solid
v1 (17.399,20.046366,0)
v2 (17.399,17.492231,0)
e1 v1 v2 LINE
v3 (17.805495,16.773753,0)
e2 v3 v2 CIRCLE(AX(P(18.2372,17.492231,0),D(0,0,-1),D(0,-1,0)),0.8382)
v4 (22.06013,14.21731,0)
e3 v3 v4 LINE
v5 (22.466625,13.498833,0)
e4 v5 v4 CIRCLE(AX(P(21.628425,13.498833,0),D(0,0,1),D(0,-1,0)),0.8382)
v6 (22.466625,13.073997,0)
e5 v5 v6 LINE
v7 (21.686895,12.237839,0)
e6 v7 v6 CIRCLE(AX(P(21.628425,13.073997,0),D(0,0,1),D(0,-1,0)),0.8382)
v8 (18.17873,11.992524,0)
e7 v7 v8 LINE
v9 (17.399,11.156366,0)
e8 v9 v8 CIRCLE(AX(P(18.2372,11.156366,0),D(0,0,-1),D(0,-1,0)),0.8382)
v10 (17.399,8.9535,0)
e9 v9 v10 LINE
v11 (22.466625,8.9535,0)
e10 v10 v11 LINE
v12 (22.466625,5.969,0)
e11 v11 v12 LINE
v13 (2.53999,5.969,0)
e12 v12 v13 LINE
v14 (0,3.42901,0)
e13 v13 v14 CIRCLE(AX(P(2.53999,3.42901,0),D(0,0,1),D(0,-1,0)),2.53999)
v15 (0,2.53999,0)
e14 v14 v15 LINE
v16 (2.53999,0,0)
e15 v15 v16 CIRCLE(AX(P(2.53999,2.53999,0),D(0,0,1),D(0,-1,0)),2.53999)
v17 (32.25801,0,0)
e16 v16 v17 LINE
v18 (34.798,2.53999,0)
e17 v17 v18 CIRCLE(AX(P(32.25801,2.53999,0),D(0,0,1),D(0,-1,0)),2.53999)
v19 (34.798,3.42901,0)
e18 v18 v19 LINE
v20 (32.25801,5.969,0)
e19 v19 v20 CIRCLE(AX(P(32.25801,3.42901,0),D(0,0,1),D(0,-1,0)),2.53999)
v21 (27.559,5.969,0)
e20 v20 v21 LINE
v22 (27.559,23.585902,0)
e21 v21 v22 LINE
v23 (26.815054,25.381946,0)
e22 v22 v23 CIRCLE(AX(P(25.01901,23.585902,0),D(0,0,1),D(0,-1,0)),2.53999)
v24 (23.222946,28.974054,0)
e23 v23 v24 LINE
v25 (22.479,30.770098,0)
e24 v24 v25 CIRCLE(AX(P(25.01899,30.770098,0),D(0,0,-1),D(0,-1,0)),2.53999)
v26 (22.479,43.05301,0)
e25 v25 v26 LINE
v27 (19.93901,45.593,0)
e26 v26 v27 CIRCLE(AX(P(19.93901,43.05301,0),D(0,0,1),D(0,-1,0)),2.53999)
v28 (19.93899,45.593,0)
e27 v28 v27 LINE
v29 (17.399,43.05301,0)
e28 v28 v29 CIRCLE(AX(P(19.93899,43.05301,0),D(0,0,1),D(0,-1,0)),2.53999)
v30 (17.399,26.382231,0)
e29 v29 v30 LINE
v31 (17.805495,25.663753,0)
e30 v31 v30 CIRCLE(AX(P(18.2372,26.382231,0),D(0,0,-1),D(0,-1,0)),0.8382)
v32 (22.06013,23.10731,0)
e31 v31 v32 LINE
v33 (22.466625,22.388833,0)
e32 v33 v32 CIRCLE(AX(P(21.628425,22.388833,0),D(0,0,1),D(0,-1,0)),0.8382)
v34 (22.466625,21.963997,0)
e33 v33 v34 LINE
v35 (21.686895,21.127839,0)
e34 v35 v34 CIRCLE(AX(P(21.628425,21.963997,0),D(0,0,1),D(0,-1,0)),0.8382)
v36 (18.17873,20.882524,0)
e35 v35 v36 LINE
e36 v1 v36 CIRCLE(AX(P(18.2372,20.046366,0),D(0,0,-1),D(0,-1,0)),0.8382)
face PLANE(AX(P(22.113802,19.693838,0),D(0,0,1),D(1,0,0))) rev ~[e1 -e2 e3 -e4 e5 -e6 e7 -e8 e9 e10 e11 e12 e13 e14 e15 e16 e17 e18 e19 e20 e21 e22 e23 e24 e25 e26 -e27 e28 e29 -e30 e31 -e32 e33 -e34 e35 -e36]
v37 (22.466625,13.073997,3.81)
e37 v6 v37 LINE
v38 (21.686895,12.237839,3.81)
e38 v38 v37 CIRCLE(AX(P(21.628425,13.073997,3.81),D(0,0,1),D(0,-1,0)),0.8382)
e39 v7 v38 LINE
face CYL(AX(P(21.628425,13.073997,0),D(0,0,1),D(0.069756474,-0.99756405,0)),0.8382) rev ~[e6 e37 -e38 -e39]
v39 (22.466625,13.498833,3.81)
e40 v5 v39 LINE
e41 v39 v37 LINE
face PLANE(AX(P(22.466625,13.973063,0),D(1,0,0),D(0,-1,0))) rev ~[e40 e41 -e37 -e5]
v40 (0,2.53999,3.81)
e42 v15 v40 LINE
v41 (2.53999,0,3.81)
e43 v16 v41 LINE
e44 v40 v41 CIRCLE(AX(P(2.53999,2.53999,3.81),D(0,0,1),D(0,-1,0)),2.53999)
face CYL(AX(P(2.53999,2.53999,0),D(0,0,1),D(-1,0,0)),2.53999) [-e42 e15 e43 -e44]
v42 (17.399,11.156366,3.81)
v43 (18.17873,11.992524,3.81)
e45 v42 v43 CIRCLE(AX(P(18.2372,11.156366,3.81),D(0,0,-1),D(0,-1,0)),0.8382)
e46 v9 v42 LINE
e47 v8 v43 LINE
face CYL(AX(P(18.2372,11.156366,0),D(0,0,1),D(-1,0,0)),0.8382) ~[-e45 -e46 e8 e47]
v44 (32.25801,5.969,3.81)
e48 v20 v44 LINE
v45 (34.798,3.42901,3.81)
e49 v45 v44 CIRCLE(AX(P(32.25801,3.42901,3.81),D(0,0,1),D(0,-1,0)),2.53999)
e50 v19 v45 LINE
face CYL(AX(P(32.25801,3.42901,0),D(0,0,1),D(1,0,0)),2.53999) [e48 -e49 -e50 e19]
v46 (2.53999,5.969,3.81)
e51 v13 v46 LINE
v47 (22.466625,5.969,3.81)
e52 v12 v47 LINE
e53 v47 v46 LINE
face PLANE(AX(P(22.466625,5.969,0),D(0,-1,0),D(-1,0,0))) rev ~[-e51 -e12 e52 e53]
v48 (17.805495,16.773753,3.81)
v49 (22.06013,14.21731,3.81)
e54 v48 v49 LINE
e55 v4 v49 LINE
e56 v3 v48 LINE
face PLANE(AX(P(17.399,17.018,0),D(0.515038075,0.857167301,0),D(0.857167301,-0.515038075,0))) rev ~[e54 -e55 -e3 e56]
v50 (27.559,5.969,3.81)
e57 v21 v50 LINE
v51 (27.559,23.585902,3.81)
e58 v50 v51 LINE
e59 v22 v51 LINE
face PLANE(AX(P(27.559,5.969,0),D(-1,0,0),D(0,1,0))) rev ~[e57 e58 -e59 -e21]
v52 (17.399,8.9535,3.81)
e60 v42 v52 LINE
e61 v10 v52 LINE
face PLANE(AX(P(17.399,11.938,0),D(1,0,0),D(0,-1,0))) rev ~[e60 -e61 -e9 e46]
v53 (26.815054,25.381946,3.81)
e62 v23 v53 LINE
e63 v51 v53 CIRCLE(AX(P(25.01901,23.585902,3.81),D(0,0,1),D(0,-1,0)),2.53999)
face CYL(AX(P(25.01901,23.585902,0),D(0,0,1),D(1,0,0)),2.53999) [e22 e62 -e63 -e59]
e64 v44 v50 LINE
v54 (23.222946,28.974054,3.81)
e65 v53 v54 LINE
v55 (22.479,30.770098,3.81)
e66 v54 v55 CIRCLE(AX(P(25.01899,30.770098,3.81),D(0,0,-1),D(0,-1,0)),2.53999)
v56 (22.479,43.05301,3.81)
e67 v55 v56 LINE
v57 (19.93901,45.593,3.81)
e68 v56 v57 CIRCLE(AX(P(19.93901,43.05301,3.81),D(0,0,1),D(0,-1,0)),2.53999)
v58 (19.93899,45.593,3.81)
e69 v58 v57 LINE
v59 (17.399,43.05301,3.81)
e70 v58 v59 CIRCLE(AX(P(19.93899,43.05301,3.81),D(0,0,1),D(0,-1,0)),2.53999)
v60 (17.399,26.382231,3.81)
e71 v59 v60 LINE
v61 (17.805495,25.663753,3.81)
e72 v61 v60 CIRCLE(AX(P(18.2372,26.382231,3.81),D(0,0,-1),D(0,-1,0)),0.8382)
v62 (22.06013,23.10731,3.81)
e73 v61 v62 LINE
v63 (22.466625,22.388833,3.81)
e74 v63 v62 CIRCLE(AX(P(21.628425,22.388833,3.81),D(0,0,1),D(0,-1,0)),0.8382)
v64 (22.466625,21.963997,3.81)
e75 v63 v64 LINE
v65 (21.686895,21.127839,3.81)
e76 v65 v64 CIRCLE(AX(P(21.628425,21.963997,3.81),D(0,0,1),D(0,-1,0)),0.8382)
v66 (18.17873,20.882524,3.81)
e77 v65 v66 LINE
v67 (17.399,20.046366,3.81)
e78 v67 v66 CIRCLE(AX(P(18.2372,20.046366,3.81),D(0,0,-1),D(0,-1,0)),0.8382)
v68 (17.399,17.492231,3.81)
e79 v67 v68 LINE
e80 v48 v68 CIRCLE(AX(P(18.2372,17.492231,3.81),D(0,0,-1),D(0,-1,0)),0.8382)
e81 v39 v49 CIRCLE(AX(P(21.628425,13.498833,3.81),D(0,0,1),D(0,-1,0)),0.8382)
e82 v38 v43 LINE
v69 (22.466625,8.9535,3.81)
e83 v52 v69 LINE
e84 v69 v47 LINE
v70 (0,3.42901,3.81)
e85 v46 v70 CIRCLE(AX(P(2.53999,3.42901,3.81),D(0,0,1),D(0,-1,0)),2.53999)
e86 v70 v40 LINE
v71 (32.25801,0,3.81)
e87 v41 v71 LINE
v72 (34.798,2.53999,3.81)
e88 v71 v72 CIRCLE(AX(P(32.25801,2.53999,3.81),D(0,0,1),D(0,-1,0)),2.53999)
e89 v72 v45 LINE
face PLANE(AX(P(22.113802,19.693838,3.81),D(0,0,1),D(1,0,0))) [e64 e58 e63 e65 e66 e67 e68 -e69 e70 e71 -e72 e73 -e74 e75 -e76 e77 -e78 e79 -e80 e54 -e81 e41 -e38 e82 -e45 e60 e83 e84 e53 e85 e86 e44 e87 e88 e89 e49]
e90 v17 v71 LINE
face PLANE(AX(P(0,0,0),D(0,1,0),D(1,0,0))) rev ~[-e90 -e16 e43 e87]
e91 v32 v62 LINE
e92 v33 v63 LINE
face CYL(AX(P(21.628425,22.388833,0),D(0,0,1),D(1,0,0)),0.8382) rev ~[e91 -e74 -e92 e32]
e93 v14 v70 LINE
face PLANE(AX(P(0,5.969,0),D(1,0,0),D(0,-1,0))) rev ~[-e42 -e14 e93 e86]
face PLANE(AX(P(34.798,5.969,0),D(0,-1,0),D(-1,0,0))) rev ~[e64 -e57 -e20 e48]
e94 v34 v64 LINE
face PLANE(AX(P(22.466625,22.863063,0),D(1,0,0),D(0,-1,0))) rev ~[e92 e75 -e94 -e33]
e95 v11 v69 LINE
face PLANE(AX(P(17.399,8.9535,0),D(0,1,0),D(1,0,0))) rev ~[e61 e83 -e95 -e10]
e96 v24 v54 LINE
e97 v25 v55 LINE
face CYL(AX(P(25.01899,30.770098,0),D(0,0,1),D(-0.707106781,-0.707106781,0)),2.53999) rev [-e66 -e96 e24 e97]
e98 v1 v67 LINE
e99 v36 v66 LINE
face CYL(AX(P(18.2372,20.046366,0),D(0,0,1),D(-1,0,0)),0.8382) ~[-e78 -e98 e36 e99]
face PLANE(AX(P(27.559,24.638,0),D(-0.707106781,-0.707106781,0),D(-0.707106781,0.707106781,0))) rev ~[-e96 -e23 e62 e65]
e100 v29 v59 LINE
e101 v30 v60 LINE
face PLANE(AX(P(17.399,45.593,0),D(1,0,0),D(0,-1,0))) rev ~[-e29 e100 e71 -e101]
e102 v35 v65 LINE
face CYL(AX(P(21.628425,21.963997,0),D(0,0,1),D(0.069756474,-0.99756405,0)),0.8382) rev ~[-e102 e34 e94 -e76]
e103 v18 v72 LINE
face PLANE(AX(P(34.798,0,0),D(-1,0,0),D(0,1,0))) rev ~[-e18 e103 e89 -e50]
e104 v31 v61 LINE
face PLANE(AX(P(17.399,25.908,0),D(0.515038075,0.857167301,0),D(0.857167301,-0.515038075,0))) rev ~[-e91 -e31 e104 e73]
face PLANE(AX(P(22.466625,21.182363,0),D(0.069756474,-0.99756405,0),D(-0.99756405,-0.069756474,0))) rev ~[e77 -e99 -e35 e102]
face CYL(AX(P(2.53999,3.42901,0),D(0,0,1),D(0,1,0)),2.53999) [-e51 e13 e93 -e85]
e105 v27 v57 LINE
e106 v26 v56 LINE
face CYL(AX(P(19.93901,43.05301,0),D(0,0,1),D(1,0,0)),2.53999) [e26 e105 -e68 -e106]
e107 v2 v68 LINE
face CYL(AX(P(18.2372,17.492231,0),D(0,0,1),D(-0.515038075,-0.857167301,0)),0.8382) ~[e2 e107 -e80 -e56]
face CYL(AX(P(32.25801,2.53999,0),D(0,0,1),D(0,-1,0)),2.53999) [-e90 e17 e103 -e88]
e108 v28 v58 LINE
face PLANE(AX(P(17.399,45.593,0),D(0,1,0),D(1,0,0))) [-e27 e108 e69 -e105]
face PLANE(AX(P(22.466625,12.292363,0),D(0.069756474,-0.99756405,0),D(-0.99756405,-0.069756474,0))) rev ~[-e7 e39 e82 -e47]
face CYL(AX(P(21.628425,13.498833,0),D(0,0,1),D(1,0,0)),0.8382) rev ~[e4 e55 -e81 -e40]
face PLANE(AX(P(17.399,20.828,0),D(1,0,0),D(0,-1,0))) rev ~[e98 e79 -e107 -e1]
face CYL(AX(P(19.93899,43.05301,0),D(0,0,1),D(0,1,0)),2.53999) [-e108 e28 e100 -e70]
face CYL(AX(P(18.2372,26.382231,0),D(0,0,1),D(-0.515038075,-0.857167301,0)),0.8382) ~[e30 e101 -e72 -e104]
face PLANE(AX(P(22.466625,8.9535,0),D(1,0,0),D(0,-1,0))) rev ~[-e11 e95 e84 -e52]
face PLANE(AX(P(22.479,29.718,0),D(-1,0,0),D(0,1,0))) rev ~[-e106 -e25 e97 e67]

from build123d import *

# Parameters (mm, degrees)
F0_W     = 5.08
F0_H     = 15.875
F1_DEPTH = 3.81
F2_R     = 2.53999
F3_R     = 0.8382


# Not quite as in the source:
# - two fillets or chamfers of one size are made in one step
# - a fillet or chamfer is up to 0.001 mm smaller than in the source, because OpenCascade refuses the exact size
# - a feature names something its author has since deleted; it is built from what else it names


with BuildPart() as f1:
    # F0 (on Top) → F1 (new body)
    with BuildSketch(Plane.XY):
        Polygon((22.4666253753, 12.2923628866), (17.399, 11.938), (27.559, 11.938), (27.559, 24.638), (22.479, 29.718), (17.399, 29.718), (17.399, 25.908), (22.4666253753, 22.86306348), (22.4666253753, 21.1823628866), (17.399, 20.828), (17.399, 17.018), (22.4666253753, 13.97306348), align=None)
        Polygon((0, 5.969), (0, 0), (34.798, 0), (34.798, 5.969), (27.559, 5.969), (27.559, 11.938), (17.399, 11.938), (17.399, 8.9535), (22.4666253753, 8.9535), (22.4666253753, 5.969), align=None)
        with Locations((19.939, 37.6555)):
            Rectangle(F0_W, F0_H)
    extrude(amount=F1_DEPTH)

    # F2 (radius 2.54 in the source; OpenCascade refuses exactly that, so slightly less here)
    f2_edges = [f1.edges().sort_by_distance(p)[0] for p in [
        (0, 0, 1.905),
        (34.798, 0, 1.905),
        (17.399, 45.593, 1.905),
        (22.479, 45.593, 1.905),
        (0, 5.969, 1.905),
        (34.798, 5.969, 1.905),
        (27.559, 24.638, 1.905),
        (22.479, 29.718, 1.905),
    ]]
    fillet(f2_edges, radius=F2_R)

    # F3
    f3_edges = [f1.edges().sort_by_distance(p)[0] for p in [
        (22.466625, 21.182363, 1.905),
        (22.466625, 22.863063, 1.905),
        (22.466625, 12.292363, 1.905),
        (22.466625, 13.973063, 1.905),
        (17.399, 11.938, 1.905),
        (17.399, 17.018, 1.905),
        (17.399, 20.828, 1.905),
        (17.399, 25.908, 1.905),
    ]]
    fillet(f3_edges, radius=F3_R)


solid = f1.part
